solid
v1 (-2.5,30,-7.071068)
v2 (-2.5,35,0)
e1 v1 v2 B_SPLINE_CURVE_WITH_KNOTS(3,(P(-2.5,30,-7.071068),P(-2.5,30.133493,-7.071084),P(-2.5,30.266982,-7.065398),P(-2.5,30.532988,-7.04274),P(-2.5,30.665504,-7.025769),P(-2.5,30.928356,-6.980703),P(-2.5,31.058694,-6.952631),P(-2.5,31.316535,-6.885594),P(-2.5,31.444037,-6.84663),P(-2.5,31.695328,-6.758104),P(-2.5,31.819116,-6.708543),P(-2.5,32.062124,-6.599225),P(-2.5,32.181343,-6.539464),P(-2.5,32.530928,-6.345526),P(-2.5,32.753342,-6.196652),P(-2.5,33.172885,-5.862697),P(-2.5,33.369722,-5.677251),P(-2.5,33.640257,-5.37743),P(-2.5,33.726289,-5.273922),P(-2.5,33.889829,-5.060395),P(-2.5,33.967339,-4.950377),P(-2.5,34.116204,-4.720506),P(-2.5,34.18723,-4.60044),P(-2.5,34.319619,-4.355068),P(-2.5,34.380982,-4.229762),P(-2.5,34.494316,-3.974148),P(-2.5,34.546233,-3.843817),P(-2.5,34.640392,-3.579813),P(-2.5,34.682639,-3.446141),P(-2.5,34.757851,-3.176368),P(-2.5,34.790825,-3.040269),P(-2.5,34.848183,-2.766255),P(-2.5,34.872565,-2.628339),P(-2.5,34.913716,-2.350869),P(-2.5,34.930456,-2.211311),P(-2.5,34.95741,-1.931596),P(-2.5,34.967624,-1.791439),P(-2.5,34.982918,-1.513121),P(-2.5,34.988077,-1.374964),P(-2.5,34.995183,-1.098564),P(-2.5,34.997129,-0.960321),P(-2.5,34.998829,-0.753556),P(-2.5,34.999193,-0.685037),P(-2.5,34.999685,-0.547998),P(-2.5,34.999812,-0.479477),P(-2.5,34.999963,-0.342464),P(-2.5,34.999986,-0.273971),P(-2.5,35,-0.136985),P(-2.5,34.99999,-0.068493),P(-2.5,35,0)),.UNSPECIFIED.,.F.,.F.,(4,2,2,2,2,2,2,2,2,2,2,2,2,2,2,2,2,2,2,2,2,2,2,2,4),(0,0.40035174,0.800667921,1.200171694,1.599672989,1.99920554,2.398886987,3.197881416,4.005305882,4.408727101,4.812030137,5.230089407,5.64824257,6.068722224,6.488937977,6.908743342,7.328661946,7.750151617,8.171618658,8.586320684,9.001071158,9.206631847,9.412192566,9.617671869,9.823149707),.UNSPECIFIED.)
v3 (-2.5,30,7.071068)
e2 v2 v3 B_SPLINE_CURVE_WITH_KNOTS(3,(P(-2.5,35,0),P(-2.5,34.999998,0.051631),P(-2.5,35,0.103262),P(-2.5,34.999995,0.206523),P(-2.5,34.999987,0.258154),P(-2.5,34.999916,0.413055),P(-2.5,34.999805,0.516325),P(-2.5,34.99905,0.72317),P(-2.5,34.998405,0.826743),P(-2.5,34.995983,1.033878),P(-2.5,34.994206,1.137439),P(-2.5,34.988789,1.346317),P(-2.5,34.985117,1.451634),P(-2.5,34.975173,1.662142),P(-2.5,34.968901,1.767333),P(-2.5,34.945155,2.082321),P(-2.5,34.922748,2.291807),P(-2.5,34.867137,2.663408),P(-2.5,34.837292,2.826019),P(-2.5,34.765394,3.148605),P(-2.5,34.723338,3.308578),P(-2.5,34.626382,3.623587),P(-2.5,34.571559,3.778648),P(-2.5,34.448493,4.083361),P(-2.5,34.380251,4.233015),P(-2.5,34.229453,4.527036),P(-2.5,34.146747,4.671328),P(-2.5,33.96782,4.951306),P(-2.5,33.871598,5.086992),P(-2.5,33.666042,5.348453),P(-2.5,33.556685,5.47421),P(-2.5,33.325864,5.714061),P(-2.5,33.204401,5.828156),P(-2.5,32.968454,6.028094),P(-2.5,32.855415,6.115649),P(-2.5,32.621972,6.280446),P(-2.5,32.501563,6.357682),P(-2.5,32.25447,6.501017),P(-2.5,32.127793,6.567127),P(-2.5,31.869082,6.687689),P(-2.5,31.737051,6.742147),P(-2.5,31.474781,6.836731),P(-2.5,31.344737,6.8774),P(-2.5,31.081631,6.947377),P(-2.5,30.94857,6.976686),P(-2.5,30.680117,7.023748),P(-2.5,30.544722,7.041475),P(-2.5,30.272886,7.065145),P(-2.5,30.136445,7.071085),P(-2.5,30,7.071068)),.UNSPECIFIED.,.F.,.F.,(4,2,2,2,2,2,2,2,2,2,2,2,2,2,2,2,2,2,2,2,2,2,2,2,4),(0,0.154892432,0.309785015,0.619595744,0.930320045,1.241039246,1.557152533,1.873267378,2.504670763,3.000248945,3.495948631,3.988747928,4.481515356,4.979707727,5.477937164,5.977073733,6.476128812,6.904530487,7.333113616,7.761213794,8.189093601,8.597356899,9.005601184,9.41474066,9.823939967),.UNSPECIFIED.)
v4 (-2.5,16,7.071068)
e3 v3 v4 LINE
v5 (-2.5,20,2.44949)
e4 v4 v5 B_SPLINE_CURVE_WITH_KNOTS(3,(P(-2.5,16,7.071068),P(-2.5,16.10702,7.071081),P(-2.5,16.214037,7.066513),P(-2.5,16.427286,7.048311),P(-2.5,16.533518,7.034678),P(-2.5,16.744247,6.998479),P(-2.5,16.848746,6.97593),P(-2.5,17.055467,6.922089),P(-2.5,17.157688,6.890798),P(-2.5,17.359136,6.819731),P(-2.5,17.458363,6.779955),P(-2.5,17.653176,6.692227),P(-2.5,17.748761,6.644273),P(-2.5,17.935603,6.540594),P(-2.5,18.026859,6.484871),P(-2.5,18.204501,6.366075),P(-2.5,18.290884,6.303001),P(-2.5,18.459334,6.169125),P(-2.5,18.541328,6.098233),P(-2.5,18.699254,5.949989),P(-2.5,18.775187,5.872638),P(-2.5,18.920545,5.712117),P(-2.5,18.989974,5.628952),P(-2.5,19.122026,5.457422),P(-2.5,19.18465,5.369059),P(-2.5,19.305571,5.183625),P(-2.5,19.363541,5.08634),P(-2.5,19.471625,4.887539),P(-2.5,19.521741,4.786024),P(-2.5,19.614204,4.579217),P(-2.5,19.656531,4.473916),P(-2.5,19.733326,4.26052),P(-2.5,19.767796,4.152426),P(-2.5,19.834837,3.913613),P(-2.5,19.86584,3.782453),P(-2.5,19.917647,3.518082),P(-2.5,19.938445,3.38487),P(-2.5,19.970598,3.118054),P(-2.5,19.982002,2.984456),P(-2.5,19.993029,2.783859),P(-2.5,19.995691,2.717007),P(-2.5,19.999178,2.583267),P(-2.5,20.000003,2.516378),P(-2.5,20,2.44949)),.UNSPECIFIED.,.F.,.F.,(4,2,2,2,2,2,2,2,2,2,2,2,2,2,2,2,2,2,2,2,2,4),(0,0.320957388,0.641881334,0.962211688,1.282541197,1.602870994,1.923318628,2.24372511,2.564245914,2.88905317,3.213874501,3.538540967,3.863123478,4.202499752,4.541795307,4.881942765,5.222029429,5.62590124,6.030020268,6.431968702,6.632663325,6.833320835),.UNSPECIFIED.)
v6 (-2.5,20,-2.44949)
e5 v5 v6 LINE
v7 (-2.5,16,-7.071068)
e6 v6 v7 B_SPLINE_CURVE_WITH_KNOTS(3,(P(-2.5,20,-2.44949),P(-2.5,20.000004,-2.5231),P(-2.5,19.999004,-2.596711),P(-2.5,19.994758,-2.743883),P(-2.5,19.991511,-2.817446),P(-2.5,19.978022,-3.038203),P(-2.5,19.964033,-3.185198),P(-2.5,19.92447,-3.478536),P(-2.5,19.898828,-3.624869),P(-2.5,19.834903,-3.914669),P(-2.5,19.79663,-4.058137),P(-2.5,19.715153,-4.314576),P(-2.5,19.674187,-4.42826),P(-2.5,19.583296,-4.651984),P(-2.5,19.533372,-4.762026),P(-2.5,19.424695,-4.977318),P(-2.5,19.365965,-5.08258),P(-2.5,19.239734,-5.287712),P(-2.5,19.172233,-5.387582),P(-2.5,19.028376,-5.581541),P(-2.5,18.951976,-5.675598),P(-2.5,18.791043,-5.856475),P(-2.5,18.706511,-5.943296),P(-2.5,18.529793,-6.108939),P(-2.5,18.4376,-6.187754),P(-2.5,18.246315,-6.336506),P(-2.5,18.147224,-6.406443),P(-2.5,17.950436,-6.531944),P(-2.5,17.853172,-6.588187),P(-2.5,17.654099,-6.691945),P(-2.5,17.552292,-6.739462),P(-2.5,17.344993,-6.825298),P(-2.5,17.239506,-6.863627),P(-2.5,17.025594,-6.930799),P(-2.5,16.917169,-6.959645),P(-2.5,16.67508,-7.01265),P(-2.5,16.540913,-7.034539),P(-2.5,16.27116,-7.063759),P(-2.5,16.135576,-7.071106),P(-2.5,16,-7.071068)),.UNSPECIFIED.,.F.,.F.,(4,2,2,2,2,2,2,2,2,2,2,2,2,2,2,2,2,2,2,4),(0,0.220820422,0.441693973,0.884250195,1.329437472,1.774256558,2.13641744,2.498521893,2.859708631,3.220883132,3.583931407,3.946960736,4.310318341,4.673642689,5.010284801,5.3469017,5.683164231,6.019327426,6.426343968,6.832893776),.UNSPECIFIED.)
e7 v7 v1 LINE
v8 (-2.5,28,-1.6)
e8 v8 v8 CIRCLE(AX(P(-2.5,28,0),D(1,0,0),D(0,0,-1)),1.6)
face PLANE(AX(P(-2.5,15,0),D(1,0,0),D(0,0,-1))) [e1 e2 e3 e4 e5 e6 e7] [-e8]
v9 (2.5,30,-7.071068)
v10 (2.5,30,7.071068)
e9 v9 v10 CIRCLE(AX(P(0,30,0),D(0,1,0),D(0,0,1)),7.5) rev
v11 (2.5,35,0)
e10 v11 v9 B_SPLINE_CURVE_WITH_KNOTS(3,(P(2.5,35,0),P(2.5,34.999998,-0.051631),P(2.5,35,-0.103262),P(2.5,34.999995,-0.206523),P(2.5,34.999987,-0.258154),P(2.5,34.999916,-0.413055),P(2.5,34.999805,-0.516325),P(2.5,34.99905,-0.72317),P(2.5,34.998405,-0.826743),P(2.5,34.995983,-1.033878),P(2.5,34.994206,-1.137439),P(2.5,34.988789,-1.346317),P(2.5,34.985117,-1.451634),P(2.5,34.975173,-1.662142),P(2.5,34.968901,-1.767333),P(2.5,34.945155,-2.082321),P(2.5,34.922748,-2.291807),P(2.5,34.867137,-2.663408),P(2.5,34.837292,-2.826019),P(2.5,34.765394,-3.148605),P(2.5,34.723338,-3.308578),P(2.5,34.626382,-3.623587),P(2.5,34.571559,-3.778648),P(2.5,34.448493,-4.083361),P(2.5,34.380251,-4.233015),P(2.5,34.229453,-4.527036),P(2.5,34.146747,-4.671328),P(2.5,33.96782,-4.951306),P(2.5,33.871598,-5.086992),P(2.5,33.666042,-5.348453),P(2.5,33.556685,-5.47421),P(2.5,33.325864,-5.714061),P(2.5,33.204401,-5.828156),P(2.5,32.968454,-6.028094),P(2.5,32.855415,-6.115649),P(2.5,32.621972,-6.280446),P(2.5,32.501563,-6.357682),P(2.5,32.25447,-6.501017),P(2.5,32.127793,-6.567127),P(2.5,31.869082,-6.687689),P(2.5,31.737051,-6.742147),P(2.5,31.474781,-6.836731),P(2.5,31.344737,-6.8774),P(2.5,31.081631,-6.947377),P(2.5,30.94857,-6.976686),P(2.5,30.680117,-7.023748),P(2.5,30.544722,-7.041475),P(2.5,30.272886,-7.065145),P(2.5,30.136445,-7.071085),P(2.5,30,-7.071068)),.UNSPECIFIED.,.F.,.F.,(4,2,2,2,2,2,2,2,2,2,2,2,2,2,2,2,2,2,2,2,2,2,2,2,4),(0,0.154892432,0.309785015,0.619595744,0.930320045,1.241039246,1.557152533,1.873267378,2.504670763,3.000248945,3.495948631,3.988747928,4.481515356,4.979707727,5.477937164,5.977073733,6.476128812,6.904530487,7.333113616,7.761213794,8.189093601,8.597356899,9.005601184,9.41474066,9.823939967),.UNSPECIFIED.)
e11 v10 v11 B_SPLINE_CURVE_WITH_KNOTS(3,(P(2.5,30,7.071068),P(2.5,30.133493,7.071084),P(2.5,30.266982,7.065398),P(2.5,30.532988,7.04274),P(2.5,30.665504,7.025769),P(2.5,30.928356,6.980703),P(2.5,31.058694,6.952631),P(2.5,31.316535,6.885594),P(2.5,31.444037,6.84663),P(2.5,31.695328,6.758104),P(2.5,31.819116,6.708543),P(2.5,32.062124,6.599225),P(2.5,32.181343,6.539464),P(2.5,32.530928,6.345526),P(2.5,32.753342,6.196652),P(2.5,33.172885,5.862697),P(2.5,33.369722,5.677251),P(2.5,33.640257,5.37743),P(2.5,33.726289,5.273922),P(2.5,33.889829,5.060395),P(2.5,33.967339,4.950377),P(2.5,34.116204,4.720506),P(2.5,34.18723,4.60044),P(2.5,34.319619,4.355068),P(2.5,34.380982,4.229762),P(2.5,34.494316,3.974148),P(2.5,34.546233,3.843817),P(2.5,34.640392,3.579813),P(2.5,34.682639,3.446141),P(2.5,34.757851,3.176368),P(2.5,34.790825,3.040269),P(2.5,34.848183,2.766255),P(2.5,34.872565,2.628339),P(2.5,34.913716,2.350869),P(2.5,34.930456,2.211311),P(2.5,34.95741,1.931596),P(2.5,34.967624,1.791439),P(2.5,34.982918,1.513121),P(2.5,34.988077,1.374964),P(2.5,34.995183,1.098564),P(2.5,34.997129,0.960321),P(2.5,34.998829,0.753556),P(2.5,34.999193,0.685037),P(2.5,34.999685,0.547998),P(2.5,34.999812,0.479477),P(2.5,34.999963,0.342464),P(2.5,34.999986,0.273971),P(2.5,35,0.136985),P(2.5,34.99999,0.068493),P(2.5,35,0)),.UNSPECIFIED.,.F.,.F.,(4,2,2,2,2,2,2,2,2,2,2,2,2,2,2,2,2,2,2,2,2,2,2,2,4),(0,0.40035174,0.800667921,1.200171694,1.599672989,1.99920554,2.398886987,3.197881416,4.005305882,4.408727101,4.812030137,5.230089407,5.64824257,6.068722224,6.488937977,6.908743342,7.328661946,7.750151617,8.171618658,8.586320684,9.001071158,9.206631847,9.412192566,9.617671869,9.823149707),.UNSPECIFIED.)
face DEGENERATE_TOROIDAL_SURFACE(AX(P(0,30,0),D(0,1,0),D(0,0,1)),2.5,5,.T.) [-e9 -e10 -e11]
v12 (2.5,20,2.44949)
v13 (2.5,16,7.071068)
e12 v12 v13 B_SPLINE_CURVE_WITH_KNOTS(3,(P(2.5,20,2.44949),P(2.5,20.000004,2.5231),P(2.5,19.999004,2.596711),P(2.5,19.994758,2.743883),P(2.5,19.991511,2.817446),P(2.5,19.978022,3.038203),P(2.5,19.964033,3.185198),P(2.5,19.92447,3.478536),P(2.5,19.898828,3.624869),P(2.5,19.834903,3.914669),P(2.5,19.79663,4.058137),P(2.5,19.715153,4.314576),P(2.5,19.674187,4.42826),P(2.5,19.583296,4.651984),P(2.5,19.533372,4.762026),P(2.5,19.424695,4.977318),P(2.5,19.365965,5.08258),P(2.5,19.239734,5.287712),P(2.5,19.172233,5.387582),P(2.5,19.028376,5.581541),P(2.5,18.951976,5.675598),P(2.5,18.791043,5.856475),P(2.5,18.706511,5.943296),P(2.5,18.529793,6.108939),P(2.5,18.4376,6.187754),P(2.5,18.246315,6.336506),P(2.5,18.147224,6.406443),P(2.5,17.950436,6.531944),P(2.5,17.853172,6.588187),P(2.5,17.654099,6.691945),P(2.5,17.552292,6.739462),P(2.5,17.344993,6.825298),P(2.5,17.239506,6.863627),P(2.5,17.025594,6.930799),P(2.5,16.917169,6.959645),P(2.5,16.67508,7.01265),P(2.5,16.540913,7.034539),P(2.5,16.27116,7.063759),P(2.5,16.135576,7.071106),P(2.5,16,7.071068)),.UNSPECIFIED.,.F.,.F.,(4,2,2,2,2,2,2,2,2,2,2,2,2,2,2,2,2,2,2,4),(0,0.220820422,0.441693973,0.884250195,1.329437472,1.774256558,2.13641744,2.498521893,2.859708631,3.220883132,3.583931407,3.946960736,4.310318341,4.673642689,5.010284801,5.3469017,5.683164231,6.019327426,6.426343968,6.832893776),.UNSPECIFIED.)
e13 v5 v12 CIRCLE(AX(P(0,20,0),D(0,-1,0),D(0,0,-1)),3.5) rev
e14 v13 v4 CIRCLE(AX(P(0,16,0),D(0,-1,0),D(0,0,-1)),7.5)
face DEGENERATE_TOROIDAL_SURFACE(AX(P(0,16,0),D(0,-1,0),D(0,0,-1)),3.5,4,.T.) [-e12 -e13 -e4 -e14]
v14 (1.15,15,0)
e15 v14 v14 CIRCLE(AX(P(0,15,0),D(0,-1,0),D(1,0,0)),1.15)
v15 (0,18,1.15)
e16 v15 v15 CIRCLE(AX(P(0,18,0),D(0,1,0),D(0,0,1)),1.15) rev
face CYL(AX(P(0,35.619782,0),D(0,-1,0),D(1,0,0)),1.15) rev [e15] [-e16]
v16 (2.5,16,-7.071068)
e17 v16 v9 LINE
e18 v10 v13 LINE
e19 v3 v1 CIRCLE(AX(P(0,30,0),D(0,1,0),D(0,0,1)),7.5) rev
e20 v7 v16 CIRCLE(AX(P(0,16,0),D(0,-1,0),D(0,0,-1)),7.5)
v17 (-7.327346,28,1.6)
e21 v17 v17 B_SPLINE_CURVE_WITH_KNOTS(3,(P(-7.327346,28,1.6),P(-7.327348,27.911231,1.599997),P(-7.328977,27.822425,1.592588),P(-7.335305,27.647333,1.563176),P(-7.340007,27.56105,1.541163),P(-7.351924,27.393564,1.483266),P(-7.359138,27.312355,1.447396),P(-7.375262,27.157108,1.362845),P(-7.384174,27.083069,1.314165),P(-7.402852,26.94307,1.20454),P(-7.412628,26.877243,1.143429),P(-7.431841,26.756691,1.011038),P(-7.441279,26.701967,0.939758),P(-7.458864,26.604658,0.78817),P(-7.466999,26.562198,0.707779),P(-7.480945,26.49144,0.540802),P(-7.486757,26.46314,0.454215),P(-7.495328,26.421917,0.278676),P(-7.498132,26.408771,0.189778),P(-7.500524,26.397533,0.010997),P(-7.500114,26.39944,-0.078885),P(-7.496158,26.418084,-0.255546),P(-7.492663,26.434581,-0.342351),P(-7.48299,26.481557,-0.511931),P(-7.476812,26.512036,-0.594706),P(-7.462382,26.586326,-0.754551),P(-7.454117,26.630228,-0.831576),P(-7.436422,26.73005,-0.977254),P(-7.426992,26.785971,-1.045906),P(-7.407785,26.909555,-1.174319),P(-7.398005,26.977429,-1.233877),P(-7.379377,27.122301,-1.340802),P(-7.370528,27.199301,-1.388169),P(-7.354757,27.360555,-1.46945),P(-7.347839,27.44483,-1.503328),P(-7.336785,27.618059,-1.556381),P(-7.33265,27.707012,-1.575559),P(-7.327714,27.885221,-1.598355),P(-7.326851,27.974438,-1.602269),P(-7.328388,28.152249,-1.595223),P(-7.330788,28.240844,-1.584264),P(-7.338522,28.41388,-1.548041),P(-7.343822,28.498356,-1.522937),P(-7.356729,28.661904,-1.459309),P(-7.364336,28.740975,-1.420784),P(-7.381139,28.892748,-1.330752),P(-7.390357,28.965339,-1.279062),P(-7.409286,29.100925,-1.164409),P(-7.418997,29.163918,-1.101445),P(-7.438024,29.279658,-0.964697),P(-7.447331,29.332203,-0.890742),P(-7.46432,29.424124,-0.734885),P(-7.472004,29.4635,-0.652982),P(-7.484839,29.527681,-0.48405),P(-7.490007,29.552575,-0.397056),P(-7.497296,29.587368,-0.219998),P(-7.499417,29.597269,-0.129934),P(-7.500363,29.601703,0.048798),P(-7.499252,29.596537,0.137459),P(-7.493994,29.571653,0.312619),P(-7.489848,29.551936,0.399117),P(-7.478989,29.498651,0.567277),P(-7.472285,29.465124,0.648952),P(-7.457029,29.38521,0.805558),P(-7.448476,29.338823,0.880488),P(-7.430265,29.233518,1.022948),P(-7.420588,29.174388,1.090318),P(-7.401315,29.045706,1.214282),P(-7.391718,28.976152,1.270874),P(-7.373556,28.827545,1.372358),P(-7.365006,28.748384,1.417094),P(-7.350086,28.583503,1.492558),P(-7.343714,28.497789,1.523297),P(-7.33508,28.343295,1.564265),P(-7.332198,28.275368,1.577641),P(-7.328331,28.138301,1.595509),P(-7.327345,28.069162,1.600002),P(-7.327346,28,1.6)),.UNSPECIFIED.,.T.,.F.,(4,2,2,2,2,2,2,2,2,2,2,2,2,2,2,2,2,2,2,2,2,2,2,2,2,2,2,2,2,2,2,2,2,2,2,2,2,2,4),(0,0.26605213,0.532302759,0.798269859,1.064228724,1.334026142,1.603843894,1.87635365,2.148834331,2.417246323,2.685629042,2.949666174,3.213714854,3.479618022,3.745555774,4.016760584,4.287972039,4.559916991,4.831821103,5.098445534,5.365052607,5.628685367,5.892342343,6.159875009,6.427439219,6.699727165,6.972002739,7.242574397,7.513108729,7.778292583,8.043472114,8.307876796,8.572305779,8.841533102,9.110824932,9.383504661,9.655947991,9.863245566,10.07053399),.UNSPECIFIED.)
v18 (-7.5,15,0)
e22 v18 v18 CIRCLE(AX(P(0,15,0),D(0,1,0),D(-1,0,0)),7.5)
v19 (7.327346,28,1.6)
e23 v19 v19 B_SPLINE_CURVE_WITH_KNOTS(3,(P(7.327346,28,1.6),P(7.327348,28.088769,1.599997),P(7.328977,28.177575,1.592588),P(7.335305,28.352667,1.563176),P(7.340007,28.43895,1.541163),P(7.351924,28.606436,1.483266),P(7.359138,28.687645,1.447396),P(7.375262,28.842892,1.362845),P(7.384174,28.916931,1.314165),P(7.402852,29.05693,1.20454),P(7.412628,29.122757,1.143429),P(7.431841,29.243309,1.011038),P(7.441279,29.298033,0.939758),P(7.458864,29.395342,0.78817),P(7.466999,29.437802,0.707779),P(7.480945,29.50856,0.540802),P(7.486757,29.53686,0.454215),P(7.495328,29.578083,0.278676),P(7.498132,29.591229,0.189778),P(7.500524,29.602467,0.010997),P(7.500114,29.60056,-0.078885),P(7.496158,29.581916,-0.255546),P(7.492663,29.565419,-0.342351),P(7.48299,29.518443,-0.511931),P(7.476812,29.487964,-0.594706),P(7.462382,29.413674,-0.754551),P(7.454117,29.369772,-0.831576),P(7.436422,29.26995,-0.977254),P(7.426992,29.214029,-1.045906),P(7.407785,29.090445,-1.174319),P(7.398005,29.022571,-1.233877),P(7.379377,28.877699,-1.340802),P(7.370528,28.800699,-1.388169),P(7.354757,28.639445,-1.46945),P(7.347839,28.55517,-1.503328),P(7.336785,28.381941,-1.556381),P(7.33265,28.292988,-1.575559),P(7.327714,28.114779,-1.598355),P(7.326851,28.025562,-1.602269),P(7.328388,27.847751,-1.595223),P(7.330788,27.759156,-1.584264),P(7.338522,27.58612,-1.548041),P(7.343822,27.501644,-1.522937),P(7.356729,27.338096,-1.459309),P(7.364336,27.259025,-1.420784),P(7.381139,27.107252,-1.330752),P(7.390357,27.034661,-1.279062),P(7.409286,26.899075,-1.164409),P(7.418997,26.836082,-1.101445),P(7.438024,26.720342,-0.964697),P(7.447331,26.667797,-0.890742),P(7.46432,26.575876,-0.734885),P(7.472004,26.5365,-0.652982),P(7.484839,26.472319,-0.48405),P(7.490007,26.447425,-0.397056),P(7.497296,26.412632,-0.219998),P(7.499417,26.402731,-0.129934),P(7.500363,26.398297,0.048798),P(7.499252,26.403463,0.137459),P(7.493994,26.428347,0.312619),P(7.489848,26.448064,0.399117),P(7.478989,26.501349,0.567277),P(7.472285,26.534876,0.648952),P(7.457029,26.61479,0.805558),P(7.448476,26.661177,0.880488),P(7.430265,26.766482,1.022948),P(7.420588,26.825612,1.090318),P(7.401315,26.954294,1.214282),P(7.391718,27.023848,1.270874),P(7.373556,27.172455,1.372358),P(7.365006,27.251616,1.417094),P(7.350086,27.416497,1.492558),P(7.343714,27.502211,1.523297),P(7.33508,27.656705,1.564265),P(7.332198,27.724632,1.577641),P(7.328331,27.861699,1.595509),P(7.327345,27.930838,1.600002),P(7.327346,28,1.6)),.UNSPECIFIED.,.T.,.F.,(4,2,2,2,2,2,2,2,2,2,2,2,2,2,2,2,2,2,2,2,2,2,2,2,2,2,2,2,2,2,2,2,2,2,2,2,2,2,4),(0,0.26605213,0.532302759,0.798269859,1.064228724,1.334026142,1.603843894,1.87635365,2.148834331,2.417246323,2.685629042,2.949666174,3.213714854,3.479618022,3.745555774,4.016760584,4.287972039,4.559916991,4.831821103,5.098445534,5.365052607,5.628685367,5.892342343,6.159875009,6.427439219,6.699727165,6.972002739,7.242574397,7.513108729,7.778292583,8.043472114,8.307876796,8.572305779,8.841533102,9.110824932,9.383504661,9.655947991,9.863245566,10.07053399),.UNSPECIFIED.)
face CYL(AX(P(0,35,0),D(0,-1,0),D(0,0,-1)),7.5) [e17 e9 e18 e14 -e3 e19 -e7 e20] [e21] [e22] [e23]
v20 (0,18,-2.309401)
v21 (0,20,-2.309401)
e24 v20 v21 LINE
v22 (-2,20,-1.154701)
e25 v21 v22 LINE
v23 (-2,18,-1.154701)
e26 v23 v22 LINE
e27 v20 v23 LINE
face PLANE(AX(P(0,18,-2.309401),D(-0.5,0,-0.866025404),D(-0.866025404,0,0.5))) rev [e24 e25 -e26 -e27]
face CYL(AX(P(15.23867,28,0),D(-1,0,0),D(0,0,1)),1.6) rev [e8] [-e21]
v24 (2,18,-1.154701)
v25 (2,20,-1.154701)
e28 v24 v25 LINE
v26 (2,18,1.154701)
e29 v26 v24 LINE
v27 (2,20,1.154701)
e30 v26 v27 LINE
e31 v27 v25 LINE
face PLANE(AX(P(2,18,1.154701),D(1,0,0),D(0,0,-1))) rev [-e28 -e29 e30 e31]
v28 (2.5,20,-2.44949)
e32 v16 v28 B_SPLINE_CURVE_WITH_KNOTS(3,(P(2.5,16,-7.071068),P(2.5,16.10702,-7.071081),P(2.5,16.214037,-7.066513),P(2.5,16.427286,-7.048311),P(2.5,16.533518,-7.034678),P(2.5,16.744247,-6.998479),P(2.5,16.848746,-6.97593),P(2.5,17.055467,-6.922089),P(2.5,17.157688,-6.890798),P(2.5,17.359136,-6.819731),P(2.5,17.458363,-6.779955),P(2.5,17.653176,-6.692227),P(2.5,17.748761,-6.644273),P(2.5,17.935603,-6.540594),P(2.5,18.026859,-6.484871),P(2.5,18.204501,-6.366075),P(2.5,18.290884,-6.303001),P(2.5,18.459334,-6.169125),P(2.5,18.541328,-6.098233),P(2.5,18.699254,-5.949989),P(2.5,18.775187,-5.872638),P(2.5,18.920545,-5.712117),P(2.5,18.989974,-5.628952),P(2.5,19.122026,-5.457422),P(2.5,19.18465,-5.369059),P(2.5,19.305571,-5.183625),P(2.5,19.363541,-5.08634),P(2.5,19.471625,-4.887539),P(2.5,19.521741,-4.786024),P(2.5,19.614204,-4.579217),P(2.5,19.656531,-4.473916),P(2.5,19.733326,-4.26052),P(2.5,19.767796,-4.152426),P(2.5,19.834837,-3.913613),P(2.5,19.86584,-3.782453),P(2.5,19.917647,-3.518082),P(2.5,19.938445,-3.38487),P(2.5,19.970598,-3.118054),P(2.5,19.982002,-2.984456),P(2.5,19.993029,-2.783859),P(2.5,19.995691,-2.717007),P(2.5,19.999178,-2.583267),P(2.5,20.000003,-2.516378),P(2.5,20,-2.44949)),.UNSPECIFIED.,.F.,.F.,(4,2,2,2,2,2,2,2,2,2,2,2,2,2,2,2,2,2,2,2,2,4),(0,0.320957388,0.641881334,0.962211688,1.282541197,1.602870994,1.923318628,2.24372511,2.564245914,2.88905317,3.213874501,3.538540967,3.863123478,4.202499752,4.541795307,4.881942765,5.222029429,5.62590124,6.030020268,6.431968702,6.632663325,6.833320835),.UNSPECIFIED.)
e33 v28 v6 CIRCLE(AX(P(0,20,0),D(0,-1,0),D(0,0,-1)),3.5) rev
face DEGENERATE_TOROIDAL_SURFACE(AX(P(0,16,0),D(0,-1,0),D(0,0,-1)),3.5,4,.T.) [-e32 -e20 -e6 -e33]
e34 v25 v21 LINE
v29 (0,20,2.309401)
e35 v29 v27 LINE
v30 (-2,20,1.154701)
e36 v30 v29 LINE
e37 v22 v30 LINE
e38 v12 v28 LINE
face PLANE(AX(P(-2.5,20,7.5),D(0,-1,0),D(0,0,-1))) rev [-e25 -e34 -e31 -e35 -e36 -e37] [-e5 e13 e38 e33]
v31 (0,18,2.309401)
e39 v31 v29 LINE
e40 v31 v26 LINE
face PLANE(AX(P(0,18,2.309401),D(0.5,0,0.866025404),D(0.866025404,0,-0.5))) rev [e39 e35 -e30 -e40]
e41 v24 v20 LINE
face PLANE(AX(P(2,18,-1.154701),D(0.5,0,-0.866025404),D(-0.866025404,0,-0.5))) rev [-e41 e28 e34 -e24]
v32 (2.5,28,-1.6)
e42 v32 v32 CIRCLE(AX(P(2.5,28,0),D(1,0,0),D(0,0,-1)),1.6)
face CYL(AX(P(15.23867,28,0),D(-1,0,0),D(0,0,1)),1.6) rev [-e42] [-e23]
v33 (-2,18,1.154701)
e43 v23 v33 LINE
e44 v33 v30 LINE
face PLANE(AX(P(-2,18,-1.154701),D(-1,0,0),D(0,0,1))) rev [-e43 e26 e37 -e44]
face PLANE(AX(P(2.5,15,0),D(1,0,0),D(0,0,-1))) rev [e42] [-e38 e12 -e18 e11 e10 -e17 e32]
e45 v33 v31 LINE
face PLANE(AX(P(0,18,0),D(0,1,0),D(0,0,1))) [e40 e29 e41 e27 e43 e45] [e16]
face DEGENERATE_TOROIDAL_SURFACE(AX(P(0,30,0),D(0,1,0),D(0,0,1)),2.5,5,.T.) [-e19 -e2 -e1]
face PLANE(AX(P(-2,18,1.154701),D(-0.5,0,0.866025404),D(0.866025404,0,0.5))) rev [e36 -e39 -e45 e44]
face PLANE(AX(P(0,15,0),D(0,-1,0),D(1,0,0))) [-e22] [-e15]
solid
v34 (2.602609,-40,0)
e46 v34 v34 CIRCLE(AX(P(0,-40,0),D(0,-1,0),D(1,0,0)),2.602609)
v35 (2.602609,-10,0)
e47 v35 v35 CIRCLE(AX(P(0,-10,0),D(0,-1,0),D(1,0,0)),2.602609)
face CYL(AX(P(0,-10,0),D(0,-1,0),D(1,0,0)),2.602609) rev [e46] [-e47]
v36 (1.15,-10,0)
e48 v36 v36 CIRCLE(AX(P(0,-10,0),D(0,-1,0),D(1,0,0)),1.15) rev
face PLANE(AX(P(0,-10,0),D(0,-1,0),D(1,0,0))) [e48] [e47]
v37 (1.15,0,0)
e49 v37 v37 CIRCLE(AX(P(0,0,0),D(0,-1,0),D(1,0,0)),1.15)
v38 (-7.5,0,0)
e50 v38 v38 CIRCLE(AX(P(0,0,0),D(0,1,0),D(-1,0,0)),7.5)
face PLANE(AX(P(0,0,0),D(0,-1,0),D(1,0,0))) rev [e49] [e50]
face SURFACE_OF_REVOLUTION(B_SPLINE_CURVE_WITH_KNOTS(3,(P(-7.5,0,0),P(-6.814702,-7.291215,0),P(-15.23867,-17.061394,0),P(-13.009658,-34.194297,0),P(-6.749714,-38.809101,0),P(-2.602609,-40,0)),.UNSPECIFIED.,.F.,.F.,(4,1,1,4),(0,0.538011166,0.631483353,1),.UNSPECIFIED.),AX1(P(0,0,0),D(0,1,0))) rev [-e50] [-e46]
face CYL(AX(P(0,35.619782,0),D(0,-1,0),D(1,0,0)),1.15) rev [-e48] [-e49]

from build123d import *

# Parameters (mm, degrees)
SKETCH1_R               = 7.5
BOSS_EXTRUDE1_DEPTH     = 20
SKETCH2_W               = 15
SKETCH2_H               = 15
CUT_EXTRUDE1_DEPTH      = 2.5
CUT_EXTRUDE2_DEPTH      = 46.499865857
CUT_EXTRUDE2_DEPTH_BACK = 46.499865857
SKETCH7_R               = 1.6
FILLET1_R               = 5
FILLET2_R               = 4
SKETCH8_R               = 1.15
CUT_EXTRUDE3_DEPTH      = 78.581086874
CUT_EXTRUDE4_DEPTH      = 2
SKETCH11_R              = 2.602609251
CUT_EXTRUDE5_DEPTH      = 30


with BuildPart() as part:
    # Sketch1 → Boss-Extrude1 (new body)
    with BuildSketch(Plane(origin=(0, 0, 0), x_dir=(1, 0, 0), z_dir=(0, 1, 0))):
        with Locations(Location((0, 0, 0), (0, 0, 270))):
            Circle(SKETCH1_R)
    extrude(amount=BOSS_EXTRUDE1_DEPTH)

    # Sketch2 → Cut-Extrude1 (cut, symmetric)
    with BuildSketch(Plane(origin=(0, 0, 0), x_dir=(0, 0, -1), z_dir=(1, 0, 0))):
        with Locations((0, 12.5)):
            Rectangle(SKETCH2_W, SKETCH2_H)
    extrude(amount=CUT_EXTRUDE1_DEPTH, both=True, mode=Mode.SUBTRACT)

    # Sketch3 → Revolve1 (revolve)
    with BuildSketch(Plane.XY, mode=Mode.PRIVATE) as revolve1_sk:
        with BuildLine():
            Line((0, 0), (-7.5, 0))
            add(Edge.make_bspline(
                [(-2.602609251, -40), (-6.749714023, -38.80910086), (-13.00965786, -34.1942967), (-15.238669507, -17.061394017), (-6.814702142, -7.291214903), (-7.5, 0)],
                knots=[0, 0, 0, 0, 0.368516647, 0.461988834, 1, 1, 1, 1], degree=3))
            Line((-2.602609251, -40), (0, -40))
            Line((0, -40), (0, 0))
        make_face()
    revolve(revolve1_sk.sketch.rotate(Axis((0, 0, 0), (0, -1, 0)), 70.528779366), axis=Axis((0, 0, 0), (0, -1, 0)))

    # Sketch7 → Cut-Extrude2 (cut, two sides: drawn at the far end of the back side and taken through both)
    with BuildSketch(Plane.ZY.offset(-2.5).offset(-CUT_EXTRUDE2_DEPTH_BACK)):
        with Locations((0, 13)):
            Circle(SKETCH7_R)
    extrude(amount=CUT_EXTRUDE2_DEPTH + CUT_EXTRUDE2_DEPTH_BACK, mode=Mode.SUBTRACT)

    # Fillet1
    fillet1_edges = [part.edges().sort_by_distance(p)[0] for p in [
        (-7.5, 20, 0),
        (7.5, 20, 0),
    ]]
    fillet(fillet1_edges, radius=FILLET1_R - 0.0001)  # a hair under: the kernel refuses the full size

    # Fillet2
    fillet2_edges = [part.edges().sort_by_distance(p)[0] for p in [
        (1.26826484, 5, 7.391989197),
        (0, 5, -7.5),
    ]]
    fillet(fillet2_edges, radius=FILLET2_R)


with BuildPart() as body_2:
    # Split1: the piece on the far side of the plane
    add(part.part)
    split(bisect_by=Plane(origin=(0, 0, 0), x_dir=(-1, 0, 0), z_dir=(0, -1, 0)), keep=Keep.BOTTOM)


with BuildPart() as part_1:
    add(part.part)

    # Split1
    split(bisect_by=Plane(origin=(0, 0, 0), x_dir=(-1, 0, 0), z_dir=(0, -1, 0)), keep=Keep.TOP)


with BuildPart() as body_2_1:
    # Body-Move/Copy1: read off the stored shape, not the designer's step
    # Body-Move/Copy1: moved
    add(body_2.part.moved(Location((0, 15, 0))))


with BuildPart() as cut_extrude3_tool:
    # Sketch8 → Cut-Extrude3 (new, through all)
    with BuildSketch(Plane.XZ.offset(40)):
        Circle(SKETCH8_R)
    extrude(amount=-CUT_EXTRUDE3_DEPTH)


with BuildPart() as part_2:
    add(part_1.part)

    # Cut-Extrude3: cut by cut_extrude3_tool
    add(cut_extrude3_tool.part, mode=Mode.SUBTRACT)

    # Sketch11 → Cut-Extrude5 (cut)
    with BuildSketch(Plane.XZ.offset(40)):
        Circle(SKETCH11_R)
    extrude(amount=-CUT_EXTRUDE5_DEPTH, mode=Mode.SUBTRACT)


with BuildPart() as body_2_2:
    add(body_2_1.part)

    # Cut-Extrude3: cut by cut_extrude3_tool
    add(cut_extrude3_tool.part, mode=Mode.SUBTRACT)

    # Sketch9 → Cut-Extrude4 (cut)
    with BuildSketch(Plane(origin=(0, 20, 0), x_dir=(1, 0, 0), z_dir=(0, 1, 0))):
        Polygon((0, 2.309401077), (-2, 1.154700538), (-2, -1.154700538), (0, -2.309401077), (2, -1.154700538), (2, 1.154700538), align=None)
    extrude(amount=-CUT_EXTRUDE4_DEPTH, mode=Mode.SUBTRACT)


solid = Compound([part_2.part, body_2_2.part])
